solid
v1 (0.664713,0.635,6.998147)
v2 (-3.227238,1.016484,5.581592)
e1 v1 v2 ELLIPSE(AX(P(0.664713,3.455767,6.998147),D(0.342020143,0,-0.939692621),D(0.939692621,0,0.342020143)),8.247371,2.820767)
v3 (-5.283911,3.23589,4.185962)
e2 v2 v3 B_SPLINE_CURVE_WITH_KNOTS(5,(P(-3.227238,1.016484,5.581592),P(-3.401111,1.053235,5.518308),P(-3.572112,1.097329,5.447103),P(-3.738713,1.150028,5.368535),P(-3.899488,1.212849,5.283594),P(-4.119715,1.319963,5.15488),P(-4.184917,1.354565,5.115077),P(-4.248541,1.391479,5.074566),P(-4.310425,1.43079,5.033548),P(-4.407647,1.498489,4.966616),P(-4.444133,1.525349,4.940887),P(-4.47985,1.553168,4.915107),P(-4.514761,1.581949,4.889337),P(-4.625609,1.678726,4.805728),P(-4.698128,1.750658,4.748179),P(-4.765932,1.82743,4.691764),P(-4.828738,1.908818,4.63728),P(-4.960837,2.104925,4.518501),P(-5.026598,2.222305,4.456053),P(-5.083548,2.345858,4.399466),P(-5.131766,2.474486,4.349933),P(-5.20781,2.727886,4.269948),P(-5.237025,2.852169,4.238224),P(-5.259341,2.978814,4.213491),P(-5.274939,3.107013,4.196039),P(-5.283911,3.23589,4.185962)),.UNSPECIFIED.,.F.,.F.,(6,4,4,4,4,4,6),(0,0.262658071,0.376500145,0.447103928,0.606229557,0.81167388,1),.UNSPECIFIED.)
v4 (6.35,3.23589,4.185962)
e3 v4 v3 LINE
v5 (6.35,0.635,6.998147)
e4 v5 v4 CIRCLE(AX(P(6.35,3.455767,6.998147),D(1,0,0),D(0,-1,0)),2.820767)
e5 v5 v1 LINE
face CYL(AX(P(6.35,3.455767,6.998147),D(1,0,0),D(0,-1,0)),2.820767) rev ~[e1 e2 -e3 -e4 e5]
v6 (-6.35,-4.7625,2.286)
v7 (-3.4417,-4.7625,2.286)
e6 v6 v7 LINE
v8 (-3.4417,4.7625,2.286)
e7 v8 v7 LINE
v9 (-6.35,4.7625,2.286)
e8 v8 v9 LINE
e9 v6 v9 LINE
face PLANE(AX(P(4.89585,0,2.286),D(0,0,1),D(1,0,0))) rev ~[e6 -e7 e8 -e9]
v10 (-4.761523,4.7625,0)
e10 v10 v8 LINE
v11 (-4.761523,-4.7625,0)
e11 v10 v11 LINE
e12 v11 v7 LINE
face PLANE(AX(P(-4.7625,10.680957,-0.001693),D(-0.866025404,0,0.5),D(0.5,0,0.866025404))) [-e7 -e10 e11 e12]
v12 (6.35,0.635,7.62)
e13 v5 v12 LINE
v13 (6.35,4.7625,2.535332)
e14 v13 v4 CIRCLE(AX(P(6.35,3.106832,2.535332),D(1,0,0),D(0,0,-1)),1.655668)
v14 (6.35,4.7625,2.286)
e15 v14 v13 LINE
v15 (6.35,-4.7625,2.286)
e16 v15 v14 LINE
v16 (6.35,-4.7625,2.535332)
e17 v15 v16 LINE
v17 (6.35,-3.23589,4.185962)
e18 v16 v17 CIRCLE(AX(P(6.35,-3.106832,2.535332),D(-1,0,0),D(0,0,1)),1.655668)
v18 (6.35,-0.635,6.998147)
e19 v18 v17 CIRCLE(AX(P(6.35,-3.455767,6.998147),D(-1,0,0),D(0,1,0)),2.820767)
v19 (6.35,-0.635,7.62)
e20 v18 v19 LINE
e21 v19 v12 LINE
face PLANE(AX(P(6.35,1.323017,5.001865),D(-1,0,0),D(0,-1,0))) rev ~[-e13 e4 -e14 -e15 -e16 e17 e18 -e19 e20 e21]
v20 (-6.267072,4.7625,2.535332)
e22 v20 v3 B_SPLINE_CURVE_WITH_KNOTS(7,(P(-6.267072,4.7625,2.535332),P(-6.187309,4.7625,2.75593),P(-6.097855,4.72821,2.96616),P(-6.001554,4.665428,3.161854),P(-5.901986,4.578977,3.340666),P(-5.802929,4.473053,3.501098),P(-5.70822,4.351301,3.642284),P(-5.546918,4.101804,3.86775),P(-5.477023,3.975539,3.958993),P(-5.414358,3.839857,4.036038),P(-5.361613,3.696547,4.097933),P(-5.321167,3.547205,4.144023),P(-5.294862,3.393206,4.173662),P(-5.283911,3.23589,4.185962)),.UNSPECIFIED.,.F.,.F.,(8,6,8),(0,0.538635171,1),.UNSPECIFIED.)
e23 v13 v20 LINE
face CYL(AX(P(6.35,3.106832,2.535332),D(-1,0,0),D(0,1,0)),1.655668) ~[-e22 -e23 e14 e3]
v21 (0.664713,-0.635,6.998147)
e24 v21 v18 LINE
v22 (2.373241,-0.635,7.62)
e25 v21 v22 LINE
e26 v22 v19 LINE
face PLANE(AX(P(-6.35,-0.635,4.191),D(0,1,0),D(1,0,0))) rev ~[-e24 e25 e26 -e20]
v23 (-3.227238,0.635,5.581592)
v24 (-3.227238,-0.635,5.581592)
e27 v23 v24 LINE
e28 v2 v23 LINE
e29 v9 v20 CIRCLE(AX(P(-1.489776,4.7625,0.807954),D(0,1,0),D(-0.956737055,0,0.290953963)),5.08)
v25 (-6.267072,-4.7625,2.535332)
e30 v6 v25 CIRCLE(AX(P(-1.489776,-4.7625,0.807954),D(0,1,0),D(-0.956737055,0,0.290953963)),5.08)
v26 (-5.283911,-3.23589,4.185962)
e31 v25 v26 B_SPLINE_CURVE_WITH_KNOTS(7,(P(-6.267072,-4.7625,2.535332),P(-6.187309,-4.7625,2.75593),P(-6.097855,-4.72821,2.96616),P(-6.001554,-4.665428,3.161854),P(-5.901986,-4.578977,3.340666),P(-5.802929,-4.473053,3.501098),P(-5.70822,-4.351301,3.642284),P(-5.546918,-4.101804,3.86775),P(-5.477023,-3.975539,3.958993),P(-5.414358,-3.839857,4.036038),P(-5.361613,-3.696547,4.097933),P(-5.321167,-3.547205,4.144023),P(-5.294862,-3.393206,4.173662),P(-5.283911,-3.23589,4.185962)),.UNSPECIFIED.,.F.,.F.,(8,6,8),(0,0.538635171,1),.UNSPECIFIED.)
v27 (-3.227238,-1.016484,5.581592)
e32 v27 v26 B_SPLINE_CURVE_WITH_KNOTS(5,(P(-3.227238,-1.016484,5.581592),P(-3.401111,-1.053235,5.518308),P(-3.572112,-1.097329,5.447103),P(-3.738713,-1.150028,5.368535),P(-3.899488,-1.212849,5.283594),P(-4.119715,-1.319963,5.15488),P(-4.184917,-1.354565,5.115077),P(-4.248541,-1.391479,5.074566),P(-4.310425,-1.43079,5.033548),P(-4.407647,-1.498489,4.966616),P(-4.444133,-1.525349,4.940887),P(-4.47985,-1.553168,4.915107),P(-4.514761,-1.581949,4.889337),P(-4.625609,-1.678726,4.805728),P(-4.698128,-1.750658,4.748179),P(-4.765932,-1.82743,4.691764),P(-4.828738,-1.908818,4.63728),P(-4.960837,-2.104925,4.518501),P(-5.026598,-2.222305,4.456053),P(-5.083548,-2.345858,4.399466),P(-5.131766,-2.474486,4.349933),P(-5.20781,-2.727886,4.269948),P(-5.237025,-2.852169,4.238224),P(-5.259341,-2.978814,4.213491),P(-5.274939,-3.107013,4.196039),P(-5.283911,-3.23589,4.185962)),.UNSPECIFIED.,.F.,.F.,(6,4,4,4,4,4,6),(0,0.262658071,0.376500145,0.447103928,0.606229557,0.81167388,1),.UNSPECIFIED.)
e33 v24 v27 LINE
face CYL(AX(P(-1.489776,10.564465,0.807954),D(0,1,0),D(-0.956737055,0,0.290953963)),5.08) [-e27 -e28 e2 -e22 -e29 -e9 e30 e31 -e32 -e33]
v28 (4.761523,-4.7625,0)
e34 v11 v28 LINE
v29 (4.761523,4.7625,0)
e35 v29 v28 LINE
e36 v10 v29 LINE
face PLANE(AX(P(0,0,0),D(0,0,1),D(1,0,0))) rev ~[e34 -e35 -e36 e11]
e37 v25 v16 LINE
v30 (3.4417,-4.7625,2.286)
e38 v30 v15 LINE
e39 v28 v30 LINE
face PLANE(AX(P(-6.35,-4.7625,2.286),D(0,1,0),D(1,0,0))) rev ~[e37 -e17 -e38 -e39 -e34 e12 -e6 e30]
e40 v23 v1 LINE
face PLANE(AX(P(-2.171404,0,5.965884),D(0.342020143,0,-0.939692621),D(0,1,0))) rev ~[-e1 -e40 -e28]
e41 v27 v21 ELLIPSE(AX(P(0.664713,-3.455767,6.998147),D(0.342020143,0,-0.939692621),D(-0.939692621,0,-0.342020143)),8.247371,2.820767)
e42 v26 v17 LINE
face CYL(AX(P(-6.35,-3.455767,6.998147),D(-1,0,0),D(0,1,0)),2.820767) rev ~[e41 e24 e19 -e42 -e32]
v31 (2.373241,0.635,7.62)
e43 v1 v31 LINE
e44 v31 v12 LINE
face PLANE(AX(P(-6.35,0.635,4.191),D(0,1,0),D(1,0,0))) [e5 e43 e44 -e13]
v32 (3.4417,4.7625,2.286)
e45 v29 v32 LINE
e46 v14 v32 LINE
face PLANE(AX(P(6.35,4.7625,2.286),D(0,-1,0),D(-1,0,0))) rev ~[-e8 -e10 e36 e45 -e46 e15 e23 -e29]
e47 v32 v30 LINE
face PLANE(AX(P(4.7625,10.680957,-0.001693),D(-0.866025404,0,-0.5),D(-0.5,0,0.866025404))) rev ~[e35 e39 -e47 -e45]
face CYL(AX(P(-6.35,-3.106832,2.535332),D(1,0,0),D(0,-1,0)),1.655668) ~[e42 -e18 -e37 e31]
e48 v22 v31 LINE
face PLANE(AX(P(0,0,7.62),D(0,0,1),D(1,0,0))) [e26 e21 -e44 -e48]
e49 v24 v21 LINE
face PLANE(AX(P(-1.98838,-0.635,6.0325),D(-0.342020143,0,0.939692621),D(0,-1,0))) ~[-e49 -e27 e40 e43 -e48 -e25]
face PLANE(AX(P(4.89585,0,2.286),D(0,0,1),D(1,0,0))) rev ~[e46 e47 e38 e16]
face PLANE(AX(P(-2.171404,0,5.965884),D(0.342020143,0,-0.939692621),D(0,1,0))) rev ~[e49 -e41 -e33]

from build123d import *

# Parameters (mm, degrees)
F0_W         = 9.525
F0_H         = 9.525
F1_DEPTH     = 2.286
F2_T1_DEPTH  = 21.3619144247
F3_W         = 2.9083
F3_H         = 9.525
F3_W_2       = 6.8834
F4_DEPTH     = 1.905
F5_R         = 1.6556676611
F6_W         = 12.7
F6_H         = 1.27
F7_DEPTH     = 3.429
F8_SIZE2     = 8.7232408068
F8_SIZE      = 3.175
F9_T4_DEPTH  = 12.7
F9_T9_DEPTH  = 12.7
F10_T1_DEPTH = 21.1289299719


# Not quite as in the source:
# - a fillet or chamfer that OpenCascade refuses, or shapes differently, is made with other operations: its cross-section is extruded or revolved along the edge and cut away or added


with BuildPart() as f1:
    # F0 (on Top) → F1 (new body)
    with BuildSketch(Plane.XY):
        Rectangle(F0_W, F0_H)
    extrude(amount=F1_DEPTH)

    # F2: chamfer of 1.3208 x 2.2876927066 on 2 edges, made by hand

    # F2_s2 → F2_t1 (cut)
    with BuildSketch(Plane.XZ.offset(-10.6809572123)):
        Polygon((-4.7625, -0.0016927066), (-3.4417, 2.286), (-4.7625, 2.286), align=None)
        Polygon((4.7625, -0.0016927066), (3.4417, 2.286), (4.7625, 2.286), align=None)
    extrude(amount=F2_T1_DEPTH, mode=Mode.SUBTRACT)

    # F3 (on face) → F4 (join)
    with BuildSketch(Plane.XY.offset(2.286)):
        with Locations((4.89585, 0)):
            Rectangle(F3_W, F3_H)
        Rectangle(F3_W_2, F3_H)
        with Locations((-4.89585, 0)):
            Rectangle(F3_W, F3_H)
    extrude(amount=F4_DEPTH)

    # F5
    f5_edges = [f1.edges().sort_by_distance(p)[0] for p in [
        (0, 4.7625, 4.191),
        (0, -4.7625, 4.191),
    ]]
    fillet(f5_edges, radius=F5_R)

    # F6 (on face) → F7 (join)
    with BuildSketch(Plane.XY.offset(4.191)):
        Rectangle(F6_W, F6_H)
    extrude(amount=F7_DEPTH)

    # F8
    f8_edges = [f1.edges().sort_by_distance(p)[0] for p in [
        (-6.35, 0, 7.62),
    ]]
    f8_side = f1.faces().sort_by_distance((-6.35, 0, 3.751025))[0]
    chamfer(f8_edges, length=F8_SIZE, length2=F8_SIZE2, reference=f8_side)

    # F9: fillet of radius 2.8207671263 on 2 edges, made by hand


with BuildPart() as f9_tool2:
    # F9_s3 → F9_t4 (new body)
    with BuildSketch(Plane.YZ.offset(-6.35)):
        with BuildLine():
            ThreePointArc((-0.635, 6.9981468006), (-1.3849039981, 5.0828783899), (-3.235890411, 4.1859623453))
            Line((-3.235890411, 4.1859623453), (-3.2139027394, 3.9047438998))
            ThreePointArc((-3.2139027394, 3.9047438998), (-3.1068323389, 3.9089232874), (-0.635, 3.9089232874))
            Line((-0.635, 3.9089232874), (-0.3529232874, 4.191))
            Line((-0.3529232874, 4.191), (-0.3529232874, 6.9981468006))
            Line((-0.3529232874, 6.9981468006), (-0.635, 6.9981468006))
        make_face()
    extrude(amount=F9_T4_DEPTH)

    split(bisect_by=Plane(origin=(-2.1714043556, 0, 5.9658844356), x_dir=(0, 1, 0), z_dir=(0.3420201433, 0, -0.9396926208)), keep=Keep.TOP)


with BuildPart() as f1_1:
    add(f1.part)

    # F9_t1: union F9_tool2
    add(f9_tool2.part)


with BuildPart() as f9_tool7:
    # F9_s8 → F9_t9 (new body)
    with BuildSketch(Plane.YZ.offset(6.35)):
        with BuildLine():
            ThreePointArc((0.635, 6.9981468006), (1.3849039981, 5.0828783899), (3.235890411, 4.1859623453))
            Line((3.235890411, 4.1859623453), (3.2139027394, 3.9047438998))
            ThreePointArc((3.2139027394, 3.9047438998), (3.1068323389, 3.9089232874), (0.635, 3.9089232874))
            Line((0.635, 3.9089232874), (0.3529232874, 4.191))
            Line((0.3529232874, 4.191), (0.3529232874, 6.9981468006))
            Line((0.3529232874, 6.9981468006), (0.635, 6.9981468006))
        make_face()
    extrude(amount=-F9_T9_DEPTH)

    split(bisect_by=Plane(origin=(-2.1714043556, 0, 5.9658844356), x_dir=(0, 1, 0), z_dir=(0.3420201433, 0, -0.9396926208)), keep=Keep.TOP)


with BuildPart() as f1_2:
    add(f1_1.part)

    # F9_t6: union F9_tool7
    add(f9_tool7.part)

    # F10: fillet of radius 5.08 on 1 edges, made by hand

    # F10_s2 → F10_t1 (cut)
    with BuildSketch(Plane.XZ.offset(-10.564464986)):
        with BuildLine():
            ThreePointArc((-6.35, 2.286), (-5.1772680397, 4.3020632997), (-3.2272380907, 5.5815923837))
            Line((-3.2272380907, 5.5815923837), (-3.2619873372, 5.677065154))
            Line((-3.2619873372, 5.677065154), (-6.3847492466, 4.5404727703))
            Line((-6.3847492466, 4.5404727703), (-6.4516, 4.445))
            ThreePointArc((-6.4516, 4.445), (-6.4516, 3.3655), (-6.4472044847, 2.3155609226))
            Line((-6.4472044847, 2.3155609226), (-6.35, 2.286))
        make_face()
    extrude(amount=F10_T1_DEPTH, mode=Mode.SUBTRACT)


solid = f1_2.part
